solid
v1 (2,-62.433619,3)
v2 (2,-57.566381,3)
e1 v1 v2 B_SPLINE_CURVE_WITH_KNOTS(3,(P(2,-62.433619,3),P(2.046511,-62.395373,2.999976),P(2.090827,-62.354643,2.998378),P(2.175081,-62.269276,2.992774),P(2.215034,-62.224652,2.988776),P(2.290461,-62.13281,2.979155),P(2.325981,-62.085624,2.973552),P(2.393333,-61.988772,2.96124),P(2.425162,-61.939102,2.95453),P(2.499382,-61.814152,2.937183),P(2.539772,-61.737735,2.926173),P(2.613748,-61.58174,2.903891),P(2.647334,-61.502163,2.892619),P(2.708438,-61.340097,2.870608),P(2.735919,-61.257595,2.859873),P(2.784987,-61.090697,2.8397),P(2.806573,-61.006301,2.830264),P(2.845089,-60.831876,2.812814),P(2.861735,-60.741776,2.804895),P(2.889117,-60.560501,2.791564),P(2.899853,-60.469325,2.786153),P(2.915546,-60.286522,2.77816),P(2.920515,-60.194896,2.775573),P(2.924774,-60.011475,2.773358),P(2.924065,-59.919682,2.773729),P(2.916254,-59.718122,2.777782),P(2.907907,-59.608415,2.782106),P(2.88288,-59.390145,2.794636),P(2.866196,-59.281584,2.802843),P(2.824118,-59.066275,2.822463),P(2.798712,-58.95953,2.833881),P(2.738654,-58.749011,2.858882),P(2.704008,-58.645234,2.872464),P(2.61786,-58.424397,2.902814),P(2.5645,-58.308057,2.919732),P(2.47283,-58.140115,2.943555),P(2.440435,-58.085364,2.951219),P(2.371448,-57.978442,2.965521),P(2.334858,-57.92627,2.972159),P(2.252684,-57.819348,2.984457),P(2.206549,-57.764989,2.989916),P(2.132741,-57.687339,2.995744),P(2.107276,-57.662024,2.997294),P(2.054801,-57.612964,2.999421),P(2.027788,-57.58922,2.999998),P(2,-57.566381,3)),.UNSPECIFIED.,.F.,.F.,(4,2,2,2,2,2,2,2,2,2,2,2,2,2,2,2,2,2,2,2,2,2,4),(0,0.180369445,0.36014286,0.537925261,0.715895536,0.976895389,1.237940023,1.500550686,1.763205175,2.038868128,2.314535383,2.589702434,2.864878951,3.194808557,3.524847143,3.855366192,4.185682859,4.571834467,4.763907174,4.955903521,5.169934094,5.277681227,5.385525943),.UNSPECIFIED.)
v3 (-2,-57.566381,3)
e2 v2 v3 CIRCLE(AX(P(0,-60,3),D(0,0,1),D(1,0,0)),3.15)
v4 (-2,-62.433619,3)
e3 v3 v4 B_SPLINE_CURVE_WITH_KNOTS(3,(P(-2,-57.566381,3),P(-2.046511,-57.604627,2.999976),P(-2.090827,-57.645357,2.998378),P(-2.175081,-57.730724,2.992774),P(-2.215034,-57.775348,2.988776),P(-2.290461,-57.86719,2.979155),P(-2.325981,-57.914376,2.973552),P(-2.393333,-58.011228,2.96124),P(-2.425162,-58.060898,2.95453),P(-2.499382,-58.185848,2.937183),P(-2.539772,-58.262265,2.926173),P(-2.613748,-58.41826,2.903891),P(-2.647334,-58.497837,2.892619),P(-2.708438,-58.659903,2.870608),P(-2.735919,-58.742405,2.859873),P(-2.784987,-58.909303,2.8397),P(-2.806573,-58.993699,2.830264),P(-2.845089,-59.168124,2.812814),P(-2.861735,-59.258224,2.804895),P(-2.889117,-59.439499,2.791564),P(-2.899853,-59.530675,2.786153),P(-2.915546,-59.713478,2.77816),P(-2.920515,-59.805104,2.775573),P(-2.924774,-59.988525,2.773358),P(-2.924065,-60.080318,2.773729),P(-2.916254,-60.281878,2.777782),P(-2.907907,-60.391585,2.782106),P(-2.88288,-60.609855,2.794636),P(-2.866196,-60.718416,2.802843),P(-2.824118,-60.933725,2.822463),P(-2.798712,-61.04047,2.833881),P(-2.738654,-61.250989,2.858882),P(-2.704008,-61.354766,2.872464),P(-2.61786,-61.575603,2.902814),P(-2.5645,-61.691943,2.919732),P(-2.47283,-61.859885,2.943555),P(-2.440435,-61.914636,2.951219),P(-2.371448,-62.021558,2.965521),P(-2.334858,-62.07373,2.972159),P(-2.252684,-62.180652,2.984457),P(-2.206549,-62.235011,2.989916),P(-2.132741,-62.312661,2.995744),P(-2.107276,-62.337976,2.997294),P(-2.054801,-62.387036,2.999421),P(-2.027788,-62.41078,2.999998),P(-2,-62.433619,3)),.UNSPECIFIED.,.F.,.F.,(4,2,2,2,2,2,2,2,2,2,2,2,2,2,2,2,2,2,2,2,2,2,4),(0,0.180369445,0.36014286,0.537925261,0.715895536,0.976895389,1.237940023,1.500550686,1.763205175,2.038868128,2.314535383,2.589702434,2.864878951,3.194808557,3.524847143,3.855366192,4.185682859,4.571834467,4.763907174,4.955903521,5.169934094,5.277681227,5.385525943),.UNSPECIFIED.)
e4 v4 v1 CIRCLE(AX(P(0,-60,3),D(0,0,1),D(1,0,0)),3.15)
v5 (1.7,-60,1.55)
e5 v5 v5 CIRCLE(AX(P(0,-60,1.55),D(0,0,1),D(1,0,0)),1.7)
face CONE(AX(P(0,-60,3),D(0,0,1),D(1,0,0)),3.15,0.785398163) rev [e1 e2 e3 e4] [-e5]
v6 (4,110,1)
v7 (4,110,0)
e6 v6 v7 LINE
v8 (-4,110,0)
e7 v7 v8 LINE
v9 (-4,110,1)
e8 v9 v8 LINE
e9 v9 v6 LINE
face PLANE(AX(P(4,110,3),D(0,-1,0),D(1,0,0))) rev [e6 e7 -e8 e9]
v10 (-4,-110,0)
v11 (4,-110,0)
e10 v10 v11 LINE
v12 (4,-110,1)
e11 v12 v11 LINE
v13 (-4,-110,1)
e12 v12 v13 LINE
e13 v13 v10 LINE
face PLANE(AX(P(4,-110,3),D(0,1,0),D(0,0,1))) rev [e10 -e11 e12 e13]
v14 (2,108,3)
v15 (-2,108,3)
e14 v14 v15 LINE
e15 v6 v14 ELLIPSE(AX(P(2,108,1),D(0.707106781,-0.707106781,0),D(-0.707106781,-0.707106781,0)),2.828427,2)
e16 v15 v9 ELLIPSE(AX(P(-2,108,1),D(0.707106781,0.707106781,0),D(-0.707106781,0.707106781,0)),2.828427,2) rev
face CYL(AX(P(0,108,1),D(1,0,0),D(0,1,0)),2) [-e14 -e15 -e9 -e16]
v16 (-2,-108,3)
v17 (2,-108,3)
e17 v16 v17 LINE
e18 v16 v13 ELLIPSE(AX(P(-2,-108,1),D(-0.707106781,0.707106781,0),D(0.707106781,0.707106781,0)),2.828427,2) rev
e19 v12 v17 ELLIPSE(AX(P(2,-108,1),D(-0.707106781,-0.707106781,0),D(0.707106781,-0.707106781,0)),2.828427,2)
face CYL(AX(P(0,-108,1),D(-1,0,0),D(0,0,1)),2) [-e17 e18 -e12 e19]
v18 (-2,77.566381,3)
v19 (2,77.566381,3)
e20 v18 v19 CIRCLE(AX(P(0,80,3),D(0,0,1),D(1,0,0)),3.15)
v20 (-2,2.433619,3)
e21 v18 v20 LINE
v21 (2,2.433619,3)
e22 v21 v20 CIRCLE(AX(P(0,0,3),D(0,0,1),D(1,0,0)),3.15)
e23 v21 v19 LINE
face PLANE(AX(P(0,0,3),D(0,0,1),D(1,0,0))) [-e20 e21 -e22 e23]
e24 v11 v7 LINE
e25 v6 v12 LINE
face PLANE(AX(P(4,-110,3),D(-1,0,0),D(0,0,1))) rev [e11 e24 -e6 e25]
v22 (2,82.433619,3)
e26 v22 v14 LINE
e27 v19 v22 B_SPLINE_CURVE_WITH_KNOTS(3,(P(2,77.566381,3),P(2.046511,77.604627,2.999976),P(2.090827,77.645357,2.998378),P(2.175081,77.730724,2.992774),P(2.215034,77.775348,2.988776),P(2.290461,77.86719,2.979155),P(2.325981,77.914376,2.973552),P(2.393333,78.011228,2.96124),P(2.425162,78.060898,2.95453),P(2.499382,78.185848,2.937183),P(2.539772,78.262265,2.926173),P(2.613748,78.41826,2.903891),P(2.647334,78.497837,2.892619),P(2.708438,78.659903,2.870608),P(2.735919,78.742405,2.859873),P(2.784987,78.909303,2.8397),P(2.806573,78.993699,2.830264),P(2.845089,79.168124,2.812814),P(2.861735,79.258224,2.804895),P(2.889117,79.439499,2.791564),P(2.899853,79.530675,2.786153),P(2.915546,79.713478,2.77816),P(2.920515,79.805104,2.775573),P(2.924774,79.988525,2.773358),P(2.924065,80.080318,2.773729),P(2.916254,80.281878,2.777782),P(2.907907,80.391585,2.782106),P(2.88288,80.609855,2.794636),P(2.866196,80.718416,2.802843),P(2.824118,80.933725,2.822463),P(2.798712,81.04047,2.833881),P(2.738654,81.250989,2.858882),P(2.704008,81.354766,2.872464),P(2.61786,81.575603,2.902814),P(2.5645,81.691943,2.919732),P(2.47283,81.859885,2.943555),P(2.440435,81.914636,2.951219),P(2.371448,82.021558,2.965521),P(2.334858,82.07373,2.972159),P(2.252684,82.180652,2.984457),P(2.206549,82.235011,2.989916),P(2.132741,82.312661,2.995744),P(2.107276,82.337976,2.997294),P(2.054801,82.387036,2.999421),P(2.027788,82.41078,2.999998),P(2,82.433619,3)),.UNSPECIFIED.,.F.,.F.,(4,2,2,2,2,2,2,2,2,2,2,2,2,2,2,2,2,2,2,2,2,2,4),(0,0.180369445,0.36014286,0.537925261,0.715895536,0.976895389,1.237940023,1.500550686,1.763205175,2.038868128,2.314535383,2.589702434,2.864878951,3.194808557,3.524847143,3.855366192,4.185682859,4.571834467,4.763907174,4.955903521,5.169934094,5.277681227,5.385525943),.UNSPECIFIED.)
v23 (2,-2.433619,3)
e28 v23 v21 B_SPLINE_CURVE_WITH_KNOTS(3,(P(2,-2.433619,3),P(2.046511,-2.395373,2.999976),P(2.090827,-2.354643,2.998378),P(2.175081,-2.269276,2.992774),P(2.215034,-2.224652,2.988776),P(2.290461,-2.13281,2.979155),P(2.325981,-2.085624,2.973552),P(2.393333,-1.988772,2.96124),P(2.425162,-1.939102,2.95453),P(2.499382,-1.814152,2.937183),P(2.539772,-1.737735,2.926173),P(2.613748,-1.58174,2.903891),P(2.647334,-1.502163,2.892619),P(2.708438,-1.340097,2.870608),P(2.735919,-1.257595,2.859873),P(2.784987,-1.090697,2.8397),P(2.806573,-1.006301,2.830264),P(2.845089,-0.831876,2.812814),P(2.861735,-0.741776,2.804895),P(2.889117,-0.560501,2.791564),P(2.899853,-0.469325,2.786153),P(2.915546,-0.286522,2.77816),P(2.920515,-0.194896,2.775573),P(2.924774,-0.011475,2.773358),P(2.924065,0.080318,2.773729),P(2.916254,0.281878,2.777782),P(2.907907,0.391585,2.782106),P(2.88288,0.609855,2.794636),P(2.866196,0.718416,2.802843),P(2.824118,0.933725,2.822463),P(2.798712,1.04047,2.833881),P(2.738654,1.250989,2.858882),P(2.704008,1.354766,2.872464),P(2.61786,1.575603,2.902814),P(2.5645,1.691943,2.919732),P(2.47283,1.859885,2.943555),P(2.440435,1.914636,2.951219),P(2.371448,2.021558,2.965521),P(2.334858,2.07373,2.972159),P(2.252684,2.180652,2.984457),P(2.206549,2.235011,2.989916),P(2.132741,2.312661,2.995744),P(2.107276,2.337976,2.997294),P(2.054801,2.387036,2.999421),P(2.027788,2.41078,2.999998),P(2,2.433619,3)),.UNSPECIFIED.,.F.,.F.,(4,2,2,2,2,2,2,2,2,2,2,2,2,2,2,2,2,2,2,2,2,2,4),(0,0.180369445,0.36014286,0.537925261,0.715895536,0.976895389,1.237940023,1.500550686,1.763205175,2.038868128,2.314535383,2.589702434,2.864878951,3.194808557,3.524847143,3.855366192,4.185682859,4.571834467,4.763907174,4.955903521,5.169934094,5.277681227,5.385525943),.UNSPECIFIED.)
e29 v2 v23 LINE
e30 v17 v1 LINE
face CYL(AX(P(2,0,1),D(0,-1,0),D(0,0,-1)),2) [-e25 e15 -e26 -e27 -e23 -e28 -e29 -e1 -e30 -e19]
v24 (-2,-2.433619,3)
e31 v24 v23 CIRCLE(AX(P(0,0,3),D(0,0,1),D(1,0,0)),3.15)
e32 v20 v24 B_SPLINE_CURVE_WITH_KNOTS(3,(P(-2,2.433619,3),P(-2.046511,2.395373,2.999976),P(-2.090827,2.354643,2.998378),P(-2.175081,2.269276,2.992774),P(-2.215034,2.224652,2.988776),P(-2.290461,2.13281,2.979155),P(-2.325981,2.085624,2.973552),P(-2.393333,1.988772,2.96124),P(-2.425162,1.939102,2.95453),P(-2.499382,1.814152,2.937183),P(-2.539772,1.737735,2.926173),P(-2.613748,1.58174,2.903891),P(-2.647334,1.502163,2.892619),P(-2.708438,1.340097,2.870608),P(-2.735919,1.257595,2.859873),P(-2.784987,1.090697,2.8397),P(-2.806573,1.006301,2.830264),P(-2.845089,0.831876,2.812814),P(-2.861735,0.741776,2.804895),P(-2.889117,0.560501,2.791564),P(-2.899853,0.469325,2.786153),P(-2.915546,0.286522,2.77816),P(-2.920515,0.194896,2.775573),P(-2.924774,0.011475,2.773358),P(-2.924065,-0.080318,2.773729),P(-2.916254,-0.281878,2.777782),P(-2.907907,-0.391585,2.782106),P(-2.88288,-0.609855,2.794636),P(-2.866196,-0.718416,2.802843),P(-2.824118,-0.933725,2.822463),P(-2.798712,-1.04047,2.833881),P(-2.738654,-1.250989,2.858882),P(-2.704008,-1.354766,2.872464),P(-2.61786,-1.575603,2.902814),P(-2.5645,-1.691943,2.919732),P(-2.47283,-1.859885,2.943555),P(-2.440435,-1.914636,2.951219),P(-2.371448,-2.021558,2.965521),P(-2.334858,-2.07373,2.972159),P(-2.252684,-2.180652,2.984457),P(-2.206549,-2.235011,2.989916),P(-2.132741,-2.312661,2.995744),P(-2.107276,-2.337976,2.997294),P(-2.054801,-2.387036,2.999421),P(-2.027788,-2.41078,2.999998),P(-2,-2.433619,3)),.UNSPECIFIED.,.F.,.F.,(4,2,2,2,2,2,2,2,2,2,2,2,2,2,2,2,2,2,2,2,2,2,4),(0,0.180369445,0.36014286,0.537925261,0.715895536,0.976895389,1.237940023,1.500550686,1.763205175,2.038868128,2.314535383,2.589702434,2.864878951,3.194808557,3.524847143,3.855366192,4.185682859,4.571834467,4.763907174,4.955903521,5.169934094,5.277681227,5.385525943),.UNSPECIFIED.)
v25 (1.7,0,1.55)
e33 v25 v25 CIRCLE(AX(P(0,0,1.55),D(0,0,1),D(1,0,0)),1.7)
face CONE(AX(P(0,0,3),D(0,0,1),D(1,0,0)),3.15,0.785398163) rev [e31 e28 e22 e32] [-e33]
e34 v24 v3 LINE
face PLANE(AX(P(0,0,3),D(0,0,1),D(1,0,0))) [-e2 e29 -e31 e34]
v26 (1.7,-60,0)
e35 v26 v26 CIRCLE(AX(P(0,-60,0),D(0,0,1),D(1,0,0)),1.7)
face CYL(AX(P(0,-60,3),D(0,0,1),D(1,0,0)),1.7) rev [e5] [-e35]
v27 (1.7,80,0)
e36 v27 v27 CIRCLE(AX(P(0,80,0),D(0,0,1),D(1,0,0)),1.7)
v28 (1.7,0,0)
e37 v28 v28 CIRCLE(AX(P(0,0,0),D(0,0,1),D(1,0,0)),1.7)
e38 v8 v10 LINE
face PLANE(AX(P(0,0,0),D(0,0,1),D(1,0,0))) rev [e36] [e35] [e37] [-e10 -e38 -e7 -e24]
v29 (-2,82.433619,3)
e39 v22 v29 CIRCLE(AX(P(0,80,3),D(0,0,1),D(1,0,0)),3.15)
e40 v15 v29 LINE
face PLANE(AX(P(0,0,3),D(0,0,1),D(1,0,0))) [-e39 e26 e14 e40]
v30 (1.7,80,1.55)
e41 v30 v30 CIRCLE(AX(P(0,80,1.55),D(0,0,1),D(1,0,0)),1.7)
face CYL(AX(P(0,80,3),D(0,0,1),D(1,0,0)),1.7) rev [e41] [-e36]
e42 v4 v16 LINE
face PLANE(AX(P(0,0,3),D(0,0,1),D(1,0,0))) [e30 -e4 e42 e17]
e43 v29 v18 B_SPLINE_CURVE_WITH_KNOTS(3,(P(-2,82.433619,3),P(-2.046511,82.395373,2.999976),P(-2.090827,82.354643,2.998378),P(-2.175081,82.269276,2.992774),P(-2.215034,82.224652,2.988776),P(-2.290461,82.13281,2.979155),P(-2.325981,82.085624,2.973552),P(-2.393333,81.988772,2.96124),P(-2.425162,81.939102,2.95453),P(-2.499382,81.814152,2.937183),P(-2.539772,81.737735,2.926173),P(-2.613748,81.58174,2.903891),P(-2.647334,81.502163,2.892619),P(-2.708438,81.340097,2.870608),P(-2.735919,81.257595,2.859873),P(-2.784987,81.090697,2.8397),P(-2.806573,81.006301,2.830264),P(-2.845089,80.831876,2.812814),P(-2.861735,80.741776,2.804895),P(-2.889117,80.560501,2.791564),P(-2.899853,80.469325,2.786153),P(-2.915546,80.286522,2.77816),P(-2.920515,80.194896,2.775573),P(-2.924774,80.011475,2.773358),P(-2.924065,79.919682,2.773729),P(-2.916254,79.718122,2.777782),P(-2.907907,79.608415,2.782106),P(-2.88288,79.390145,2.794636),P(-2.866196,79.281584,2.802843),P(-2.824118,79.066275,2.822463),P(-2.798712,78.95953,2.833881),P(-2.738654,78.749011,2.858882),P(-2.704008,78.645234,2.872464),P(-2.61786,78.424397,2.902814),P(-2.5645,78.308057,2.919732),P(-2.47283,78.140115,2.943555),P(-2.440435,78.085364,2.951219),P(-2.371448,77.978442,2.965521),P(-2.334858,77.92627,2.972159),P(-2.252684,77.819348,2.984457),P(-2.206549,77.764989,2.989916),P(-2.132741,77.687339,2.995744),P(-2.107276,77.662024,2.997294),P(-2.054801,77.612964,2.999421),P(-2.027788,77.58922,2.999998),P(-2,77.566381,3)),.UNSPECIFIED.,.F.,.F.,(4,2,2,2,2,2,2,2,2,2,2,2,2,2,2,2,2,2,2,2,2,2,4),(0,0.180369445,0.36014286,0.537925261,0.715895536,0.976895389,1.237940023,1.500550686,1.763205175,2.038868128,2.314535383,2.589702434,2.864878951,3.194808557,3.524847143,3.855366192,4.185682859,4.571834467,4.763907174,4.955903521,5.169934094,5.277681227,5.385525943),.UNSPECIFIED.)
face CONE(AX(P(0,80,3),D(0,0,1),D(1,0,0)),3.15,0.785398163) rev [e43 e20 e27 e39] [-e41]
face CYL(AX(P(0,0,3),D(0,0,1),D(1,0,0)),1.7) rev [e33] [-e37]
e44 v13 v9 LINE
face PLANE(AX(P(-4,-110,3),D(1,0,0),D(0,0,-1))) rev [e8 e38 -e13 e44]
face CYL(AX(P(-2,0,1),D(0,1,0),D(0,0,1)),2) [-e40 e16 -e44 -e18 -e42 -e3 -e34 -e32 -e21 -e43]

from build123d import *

# Parameters (mm, degrees)
SKETCH_1_W                   = 8
SKETCH_1_H                   = 220
SKETCH_1_R                   = 1.6
EXTRUDE_1_DEPTH              = 3
HOLE_WIZARD_M3_1_D           = 3.4
HOLE_WIZARD_M3_1_DEPTH       = 5
HOLE_WIZARD_M3_1_CSINK_D     = 6.3
HOLE_WIZARD_M3_1_CSINK_ANGLE = 90
HOLE_WIZARD_M3_1_TIP         = 1.021463052
FILLET_1_R                   = 2


with BuildPart() as part:
    # ｽｹｯﾁ1 → ﾎﾞｽ - 押し出し1 (new body)
    with BuildSketch(Plane.XY):
        Rectangle(SKETCH_1_W, SKETCH_1_H)
        with Locations((0, 80)):
            Circle(SKETCH_1_R, mode=Mode.SUBTRACT)
        Circle(SKETCH_1_R, mode=Mode.SUBTRACT)
        with Locations((0, -60)):
            Circle(SKETCH_1_R, mode=Mode.SUBTRACT)
    extrude(amount=EXTRUDE_1_DEPTH)

    # M3 平皿頭ねじ用皿穴1
    with Locations(Plane.XY.offset(3)):
        with Locations((0, -60), (0, 0), (0, 80)):
            CounterSinkHole(HOLE_WIZARD_M3_1_D / 2, HOLE_WIZARD_M3_1_CSINK_D / 2, depth=HOLE_WIZARD_M3_1_DEPTH, counter_sink_angle=HOLE_WIZARD_M3_1_CSINK_ANGLE)
            with Locations((0, 0, -(HOLE_WIZARD_M3_1_DEPTH + HOLE_WIZARD_M3_1_TIP / 2))):  # 118° drill point
                Cone(0, HOLE_WIZARD_M3_1_D / 2, HOLE_WIZARD_M3_1_TIP, mode=Mode.SUBTRACT)

    # ﾌｨﾚｯﾄ1
    # the kernel refuses this fillet: 2 mm, written as the material it takes off along each edge
    with BuildSketch(Plane(origin=(4, 115, 3), x_dir=(-1, 0, 0), z_dir=(0, -1, 0)), Plane(origin=(-4, -115, 3), x_dir=(1, 0, 0), z_dir=(0, 1, 0))) as fillet_1_piece_1:
        with BuildLine():
            CenterArc((FILLET_1_R, FILLET_1_R), FILLET_1_R, 180, 90)
            Line((0, FILLET_1_R), (0, 0))
            Line((0, 0), (FILLET_1_R, 0))
        make_face()
    extrude(amount=230, mode=Mode.SUBTRACT)
    with BuildSketch(Plane(origin=(-9, 110, 3), x_dir=(0, -1, 0), z_dir=(1, 0, 0))) as fillet_1_piece_2:
        with BuildLine():
            CenterArc((FILLET_1_R, FILLET_1_R), FILLET_1_R, 180, 90)
            Line((0, FILLET_1_R), (0, 0))
            Line((0, 0), (FILLET_1_R, 0))
        make_face()
    extrude(amount=18, mode=Mode.SUBTRACT)
    with BuildSketch(Plane(origin=(9, -110, 3), x_dir=(0, 0, -1), z_dir=(-1, 0, 0))) as fillet_1_piece_3:
        with BuildLine():
            CenterArc((FILLET_1_R, -FILLET_1_R), FILLET_1_R, 90, 90)
            Line((0, -FILLET_1_R), (0, 0))
            Line((0, 0), (FILLET_1_R, 0))
        make_face()
    extrude(amount=18, mode=Mode.SUBTRACT)


solid = part.part
